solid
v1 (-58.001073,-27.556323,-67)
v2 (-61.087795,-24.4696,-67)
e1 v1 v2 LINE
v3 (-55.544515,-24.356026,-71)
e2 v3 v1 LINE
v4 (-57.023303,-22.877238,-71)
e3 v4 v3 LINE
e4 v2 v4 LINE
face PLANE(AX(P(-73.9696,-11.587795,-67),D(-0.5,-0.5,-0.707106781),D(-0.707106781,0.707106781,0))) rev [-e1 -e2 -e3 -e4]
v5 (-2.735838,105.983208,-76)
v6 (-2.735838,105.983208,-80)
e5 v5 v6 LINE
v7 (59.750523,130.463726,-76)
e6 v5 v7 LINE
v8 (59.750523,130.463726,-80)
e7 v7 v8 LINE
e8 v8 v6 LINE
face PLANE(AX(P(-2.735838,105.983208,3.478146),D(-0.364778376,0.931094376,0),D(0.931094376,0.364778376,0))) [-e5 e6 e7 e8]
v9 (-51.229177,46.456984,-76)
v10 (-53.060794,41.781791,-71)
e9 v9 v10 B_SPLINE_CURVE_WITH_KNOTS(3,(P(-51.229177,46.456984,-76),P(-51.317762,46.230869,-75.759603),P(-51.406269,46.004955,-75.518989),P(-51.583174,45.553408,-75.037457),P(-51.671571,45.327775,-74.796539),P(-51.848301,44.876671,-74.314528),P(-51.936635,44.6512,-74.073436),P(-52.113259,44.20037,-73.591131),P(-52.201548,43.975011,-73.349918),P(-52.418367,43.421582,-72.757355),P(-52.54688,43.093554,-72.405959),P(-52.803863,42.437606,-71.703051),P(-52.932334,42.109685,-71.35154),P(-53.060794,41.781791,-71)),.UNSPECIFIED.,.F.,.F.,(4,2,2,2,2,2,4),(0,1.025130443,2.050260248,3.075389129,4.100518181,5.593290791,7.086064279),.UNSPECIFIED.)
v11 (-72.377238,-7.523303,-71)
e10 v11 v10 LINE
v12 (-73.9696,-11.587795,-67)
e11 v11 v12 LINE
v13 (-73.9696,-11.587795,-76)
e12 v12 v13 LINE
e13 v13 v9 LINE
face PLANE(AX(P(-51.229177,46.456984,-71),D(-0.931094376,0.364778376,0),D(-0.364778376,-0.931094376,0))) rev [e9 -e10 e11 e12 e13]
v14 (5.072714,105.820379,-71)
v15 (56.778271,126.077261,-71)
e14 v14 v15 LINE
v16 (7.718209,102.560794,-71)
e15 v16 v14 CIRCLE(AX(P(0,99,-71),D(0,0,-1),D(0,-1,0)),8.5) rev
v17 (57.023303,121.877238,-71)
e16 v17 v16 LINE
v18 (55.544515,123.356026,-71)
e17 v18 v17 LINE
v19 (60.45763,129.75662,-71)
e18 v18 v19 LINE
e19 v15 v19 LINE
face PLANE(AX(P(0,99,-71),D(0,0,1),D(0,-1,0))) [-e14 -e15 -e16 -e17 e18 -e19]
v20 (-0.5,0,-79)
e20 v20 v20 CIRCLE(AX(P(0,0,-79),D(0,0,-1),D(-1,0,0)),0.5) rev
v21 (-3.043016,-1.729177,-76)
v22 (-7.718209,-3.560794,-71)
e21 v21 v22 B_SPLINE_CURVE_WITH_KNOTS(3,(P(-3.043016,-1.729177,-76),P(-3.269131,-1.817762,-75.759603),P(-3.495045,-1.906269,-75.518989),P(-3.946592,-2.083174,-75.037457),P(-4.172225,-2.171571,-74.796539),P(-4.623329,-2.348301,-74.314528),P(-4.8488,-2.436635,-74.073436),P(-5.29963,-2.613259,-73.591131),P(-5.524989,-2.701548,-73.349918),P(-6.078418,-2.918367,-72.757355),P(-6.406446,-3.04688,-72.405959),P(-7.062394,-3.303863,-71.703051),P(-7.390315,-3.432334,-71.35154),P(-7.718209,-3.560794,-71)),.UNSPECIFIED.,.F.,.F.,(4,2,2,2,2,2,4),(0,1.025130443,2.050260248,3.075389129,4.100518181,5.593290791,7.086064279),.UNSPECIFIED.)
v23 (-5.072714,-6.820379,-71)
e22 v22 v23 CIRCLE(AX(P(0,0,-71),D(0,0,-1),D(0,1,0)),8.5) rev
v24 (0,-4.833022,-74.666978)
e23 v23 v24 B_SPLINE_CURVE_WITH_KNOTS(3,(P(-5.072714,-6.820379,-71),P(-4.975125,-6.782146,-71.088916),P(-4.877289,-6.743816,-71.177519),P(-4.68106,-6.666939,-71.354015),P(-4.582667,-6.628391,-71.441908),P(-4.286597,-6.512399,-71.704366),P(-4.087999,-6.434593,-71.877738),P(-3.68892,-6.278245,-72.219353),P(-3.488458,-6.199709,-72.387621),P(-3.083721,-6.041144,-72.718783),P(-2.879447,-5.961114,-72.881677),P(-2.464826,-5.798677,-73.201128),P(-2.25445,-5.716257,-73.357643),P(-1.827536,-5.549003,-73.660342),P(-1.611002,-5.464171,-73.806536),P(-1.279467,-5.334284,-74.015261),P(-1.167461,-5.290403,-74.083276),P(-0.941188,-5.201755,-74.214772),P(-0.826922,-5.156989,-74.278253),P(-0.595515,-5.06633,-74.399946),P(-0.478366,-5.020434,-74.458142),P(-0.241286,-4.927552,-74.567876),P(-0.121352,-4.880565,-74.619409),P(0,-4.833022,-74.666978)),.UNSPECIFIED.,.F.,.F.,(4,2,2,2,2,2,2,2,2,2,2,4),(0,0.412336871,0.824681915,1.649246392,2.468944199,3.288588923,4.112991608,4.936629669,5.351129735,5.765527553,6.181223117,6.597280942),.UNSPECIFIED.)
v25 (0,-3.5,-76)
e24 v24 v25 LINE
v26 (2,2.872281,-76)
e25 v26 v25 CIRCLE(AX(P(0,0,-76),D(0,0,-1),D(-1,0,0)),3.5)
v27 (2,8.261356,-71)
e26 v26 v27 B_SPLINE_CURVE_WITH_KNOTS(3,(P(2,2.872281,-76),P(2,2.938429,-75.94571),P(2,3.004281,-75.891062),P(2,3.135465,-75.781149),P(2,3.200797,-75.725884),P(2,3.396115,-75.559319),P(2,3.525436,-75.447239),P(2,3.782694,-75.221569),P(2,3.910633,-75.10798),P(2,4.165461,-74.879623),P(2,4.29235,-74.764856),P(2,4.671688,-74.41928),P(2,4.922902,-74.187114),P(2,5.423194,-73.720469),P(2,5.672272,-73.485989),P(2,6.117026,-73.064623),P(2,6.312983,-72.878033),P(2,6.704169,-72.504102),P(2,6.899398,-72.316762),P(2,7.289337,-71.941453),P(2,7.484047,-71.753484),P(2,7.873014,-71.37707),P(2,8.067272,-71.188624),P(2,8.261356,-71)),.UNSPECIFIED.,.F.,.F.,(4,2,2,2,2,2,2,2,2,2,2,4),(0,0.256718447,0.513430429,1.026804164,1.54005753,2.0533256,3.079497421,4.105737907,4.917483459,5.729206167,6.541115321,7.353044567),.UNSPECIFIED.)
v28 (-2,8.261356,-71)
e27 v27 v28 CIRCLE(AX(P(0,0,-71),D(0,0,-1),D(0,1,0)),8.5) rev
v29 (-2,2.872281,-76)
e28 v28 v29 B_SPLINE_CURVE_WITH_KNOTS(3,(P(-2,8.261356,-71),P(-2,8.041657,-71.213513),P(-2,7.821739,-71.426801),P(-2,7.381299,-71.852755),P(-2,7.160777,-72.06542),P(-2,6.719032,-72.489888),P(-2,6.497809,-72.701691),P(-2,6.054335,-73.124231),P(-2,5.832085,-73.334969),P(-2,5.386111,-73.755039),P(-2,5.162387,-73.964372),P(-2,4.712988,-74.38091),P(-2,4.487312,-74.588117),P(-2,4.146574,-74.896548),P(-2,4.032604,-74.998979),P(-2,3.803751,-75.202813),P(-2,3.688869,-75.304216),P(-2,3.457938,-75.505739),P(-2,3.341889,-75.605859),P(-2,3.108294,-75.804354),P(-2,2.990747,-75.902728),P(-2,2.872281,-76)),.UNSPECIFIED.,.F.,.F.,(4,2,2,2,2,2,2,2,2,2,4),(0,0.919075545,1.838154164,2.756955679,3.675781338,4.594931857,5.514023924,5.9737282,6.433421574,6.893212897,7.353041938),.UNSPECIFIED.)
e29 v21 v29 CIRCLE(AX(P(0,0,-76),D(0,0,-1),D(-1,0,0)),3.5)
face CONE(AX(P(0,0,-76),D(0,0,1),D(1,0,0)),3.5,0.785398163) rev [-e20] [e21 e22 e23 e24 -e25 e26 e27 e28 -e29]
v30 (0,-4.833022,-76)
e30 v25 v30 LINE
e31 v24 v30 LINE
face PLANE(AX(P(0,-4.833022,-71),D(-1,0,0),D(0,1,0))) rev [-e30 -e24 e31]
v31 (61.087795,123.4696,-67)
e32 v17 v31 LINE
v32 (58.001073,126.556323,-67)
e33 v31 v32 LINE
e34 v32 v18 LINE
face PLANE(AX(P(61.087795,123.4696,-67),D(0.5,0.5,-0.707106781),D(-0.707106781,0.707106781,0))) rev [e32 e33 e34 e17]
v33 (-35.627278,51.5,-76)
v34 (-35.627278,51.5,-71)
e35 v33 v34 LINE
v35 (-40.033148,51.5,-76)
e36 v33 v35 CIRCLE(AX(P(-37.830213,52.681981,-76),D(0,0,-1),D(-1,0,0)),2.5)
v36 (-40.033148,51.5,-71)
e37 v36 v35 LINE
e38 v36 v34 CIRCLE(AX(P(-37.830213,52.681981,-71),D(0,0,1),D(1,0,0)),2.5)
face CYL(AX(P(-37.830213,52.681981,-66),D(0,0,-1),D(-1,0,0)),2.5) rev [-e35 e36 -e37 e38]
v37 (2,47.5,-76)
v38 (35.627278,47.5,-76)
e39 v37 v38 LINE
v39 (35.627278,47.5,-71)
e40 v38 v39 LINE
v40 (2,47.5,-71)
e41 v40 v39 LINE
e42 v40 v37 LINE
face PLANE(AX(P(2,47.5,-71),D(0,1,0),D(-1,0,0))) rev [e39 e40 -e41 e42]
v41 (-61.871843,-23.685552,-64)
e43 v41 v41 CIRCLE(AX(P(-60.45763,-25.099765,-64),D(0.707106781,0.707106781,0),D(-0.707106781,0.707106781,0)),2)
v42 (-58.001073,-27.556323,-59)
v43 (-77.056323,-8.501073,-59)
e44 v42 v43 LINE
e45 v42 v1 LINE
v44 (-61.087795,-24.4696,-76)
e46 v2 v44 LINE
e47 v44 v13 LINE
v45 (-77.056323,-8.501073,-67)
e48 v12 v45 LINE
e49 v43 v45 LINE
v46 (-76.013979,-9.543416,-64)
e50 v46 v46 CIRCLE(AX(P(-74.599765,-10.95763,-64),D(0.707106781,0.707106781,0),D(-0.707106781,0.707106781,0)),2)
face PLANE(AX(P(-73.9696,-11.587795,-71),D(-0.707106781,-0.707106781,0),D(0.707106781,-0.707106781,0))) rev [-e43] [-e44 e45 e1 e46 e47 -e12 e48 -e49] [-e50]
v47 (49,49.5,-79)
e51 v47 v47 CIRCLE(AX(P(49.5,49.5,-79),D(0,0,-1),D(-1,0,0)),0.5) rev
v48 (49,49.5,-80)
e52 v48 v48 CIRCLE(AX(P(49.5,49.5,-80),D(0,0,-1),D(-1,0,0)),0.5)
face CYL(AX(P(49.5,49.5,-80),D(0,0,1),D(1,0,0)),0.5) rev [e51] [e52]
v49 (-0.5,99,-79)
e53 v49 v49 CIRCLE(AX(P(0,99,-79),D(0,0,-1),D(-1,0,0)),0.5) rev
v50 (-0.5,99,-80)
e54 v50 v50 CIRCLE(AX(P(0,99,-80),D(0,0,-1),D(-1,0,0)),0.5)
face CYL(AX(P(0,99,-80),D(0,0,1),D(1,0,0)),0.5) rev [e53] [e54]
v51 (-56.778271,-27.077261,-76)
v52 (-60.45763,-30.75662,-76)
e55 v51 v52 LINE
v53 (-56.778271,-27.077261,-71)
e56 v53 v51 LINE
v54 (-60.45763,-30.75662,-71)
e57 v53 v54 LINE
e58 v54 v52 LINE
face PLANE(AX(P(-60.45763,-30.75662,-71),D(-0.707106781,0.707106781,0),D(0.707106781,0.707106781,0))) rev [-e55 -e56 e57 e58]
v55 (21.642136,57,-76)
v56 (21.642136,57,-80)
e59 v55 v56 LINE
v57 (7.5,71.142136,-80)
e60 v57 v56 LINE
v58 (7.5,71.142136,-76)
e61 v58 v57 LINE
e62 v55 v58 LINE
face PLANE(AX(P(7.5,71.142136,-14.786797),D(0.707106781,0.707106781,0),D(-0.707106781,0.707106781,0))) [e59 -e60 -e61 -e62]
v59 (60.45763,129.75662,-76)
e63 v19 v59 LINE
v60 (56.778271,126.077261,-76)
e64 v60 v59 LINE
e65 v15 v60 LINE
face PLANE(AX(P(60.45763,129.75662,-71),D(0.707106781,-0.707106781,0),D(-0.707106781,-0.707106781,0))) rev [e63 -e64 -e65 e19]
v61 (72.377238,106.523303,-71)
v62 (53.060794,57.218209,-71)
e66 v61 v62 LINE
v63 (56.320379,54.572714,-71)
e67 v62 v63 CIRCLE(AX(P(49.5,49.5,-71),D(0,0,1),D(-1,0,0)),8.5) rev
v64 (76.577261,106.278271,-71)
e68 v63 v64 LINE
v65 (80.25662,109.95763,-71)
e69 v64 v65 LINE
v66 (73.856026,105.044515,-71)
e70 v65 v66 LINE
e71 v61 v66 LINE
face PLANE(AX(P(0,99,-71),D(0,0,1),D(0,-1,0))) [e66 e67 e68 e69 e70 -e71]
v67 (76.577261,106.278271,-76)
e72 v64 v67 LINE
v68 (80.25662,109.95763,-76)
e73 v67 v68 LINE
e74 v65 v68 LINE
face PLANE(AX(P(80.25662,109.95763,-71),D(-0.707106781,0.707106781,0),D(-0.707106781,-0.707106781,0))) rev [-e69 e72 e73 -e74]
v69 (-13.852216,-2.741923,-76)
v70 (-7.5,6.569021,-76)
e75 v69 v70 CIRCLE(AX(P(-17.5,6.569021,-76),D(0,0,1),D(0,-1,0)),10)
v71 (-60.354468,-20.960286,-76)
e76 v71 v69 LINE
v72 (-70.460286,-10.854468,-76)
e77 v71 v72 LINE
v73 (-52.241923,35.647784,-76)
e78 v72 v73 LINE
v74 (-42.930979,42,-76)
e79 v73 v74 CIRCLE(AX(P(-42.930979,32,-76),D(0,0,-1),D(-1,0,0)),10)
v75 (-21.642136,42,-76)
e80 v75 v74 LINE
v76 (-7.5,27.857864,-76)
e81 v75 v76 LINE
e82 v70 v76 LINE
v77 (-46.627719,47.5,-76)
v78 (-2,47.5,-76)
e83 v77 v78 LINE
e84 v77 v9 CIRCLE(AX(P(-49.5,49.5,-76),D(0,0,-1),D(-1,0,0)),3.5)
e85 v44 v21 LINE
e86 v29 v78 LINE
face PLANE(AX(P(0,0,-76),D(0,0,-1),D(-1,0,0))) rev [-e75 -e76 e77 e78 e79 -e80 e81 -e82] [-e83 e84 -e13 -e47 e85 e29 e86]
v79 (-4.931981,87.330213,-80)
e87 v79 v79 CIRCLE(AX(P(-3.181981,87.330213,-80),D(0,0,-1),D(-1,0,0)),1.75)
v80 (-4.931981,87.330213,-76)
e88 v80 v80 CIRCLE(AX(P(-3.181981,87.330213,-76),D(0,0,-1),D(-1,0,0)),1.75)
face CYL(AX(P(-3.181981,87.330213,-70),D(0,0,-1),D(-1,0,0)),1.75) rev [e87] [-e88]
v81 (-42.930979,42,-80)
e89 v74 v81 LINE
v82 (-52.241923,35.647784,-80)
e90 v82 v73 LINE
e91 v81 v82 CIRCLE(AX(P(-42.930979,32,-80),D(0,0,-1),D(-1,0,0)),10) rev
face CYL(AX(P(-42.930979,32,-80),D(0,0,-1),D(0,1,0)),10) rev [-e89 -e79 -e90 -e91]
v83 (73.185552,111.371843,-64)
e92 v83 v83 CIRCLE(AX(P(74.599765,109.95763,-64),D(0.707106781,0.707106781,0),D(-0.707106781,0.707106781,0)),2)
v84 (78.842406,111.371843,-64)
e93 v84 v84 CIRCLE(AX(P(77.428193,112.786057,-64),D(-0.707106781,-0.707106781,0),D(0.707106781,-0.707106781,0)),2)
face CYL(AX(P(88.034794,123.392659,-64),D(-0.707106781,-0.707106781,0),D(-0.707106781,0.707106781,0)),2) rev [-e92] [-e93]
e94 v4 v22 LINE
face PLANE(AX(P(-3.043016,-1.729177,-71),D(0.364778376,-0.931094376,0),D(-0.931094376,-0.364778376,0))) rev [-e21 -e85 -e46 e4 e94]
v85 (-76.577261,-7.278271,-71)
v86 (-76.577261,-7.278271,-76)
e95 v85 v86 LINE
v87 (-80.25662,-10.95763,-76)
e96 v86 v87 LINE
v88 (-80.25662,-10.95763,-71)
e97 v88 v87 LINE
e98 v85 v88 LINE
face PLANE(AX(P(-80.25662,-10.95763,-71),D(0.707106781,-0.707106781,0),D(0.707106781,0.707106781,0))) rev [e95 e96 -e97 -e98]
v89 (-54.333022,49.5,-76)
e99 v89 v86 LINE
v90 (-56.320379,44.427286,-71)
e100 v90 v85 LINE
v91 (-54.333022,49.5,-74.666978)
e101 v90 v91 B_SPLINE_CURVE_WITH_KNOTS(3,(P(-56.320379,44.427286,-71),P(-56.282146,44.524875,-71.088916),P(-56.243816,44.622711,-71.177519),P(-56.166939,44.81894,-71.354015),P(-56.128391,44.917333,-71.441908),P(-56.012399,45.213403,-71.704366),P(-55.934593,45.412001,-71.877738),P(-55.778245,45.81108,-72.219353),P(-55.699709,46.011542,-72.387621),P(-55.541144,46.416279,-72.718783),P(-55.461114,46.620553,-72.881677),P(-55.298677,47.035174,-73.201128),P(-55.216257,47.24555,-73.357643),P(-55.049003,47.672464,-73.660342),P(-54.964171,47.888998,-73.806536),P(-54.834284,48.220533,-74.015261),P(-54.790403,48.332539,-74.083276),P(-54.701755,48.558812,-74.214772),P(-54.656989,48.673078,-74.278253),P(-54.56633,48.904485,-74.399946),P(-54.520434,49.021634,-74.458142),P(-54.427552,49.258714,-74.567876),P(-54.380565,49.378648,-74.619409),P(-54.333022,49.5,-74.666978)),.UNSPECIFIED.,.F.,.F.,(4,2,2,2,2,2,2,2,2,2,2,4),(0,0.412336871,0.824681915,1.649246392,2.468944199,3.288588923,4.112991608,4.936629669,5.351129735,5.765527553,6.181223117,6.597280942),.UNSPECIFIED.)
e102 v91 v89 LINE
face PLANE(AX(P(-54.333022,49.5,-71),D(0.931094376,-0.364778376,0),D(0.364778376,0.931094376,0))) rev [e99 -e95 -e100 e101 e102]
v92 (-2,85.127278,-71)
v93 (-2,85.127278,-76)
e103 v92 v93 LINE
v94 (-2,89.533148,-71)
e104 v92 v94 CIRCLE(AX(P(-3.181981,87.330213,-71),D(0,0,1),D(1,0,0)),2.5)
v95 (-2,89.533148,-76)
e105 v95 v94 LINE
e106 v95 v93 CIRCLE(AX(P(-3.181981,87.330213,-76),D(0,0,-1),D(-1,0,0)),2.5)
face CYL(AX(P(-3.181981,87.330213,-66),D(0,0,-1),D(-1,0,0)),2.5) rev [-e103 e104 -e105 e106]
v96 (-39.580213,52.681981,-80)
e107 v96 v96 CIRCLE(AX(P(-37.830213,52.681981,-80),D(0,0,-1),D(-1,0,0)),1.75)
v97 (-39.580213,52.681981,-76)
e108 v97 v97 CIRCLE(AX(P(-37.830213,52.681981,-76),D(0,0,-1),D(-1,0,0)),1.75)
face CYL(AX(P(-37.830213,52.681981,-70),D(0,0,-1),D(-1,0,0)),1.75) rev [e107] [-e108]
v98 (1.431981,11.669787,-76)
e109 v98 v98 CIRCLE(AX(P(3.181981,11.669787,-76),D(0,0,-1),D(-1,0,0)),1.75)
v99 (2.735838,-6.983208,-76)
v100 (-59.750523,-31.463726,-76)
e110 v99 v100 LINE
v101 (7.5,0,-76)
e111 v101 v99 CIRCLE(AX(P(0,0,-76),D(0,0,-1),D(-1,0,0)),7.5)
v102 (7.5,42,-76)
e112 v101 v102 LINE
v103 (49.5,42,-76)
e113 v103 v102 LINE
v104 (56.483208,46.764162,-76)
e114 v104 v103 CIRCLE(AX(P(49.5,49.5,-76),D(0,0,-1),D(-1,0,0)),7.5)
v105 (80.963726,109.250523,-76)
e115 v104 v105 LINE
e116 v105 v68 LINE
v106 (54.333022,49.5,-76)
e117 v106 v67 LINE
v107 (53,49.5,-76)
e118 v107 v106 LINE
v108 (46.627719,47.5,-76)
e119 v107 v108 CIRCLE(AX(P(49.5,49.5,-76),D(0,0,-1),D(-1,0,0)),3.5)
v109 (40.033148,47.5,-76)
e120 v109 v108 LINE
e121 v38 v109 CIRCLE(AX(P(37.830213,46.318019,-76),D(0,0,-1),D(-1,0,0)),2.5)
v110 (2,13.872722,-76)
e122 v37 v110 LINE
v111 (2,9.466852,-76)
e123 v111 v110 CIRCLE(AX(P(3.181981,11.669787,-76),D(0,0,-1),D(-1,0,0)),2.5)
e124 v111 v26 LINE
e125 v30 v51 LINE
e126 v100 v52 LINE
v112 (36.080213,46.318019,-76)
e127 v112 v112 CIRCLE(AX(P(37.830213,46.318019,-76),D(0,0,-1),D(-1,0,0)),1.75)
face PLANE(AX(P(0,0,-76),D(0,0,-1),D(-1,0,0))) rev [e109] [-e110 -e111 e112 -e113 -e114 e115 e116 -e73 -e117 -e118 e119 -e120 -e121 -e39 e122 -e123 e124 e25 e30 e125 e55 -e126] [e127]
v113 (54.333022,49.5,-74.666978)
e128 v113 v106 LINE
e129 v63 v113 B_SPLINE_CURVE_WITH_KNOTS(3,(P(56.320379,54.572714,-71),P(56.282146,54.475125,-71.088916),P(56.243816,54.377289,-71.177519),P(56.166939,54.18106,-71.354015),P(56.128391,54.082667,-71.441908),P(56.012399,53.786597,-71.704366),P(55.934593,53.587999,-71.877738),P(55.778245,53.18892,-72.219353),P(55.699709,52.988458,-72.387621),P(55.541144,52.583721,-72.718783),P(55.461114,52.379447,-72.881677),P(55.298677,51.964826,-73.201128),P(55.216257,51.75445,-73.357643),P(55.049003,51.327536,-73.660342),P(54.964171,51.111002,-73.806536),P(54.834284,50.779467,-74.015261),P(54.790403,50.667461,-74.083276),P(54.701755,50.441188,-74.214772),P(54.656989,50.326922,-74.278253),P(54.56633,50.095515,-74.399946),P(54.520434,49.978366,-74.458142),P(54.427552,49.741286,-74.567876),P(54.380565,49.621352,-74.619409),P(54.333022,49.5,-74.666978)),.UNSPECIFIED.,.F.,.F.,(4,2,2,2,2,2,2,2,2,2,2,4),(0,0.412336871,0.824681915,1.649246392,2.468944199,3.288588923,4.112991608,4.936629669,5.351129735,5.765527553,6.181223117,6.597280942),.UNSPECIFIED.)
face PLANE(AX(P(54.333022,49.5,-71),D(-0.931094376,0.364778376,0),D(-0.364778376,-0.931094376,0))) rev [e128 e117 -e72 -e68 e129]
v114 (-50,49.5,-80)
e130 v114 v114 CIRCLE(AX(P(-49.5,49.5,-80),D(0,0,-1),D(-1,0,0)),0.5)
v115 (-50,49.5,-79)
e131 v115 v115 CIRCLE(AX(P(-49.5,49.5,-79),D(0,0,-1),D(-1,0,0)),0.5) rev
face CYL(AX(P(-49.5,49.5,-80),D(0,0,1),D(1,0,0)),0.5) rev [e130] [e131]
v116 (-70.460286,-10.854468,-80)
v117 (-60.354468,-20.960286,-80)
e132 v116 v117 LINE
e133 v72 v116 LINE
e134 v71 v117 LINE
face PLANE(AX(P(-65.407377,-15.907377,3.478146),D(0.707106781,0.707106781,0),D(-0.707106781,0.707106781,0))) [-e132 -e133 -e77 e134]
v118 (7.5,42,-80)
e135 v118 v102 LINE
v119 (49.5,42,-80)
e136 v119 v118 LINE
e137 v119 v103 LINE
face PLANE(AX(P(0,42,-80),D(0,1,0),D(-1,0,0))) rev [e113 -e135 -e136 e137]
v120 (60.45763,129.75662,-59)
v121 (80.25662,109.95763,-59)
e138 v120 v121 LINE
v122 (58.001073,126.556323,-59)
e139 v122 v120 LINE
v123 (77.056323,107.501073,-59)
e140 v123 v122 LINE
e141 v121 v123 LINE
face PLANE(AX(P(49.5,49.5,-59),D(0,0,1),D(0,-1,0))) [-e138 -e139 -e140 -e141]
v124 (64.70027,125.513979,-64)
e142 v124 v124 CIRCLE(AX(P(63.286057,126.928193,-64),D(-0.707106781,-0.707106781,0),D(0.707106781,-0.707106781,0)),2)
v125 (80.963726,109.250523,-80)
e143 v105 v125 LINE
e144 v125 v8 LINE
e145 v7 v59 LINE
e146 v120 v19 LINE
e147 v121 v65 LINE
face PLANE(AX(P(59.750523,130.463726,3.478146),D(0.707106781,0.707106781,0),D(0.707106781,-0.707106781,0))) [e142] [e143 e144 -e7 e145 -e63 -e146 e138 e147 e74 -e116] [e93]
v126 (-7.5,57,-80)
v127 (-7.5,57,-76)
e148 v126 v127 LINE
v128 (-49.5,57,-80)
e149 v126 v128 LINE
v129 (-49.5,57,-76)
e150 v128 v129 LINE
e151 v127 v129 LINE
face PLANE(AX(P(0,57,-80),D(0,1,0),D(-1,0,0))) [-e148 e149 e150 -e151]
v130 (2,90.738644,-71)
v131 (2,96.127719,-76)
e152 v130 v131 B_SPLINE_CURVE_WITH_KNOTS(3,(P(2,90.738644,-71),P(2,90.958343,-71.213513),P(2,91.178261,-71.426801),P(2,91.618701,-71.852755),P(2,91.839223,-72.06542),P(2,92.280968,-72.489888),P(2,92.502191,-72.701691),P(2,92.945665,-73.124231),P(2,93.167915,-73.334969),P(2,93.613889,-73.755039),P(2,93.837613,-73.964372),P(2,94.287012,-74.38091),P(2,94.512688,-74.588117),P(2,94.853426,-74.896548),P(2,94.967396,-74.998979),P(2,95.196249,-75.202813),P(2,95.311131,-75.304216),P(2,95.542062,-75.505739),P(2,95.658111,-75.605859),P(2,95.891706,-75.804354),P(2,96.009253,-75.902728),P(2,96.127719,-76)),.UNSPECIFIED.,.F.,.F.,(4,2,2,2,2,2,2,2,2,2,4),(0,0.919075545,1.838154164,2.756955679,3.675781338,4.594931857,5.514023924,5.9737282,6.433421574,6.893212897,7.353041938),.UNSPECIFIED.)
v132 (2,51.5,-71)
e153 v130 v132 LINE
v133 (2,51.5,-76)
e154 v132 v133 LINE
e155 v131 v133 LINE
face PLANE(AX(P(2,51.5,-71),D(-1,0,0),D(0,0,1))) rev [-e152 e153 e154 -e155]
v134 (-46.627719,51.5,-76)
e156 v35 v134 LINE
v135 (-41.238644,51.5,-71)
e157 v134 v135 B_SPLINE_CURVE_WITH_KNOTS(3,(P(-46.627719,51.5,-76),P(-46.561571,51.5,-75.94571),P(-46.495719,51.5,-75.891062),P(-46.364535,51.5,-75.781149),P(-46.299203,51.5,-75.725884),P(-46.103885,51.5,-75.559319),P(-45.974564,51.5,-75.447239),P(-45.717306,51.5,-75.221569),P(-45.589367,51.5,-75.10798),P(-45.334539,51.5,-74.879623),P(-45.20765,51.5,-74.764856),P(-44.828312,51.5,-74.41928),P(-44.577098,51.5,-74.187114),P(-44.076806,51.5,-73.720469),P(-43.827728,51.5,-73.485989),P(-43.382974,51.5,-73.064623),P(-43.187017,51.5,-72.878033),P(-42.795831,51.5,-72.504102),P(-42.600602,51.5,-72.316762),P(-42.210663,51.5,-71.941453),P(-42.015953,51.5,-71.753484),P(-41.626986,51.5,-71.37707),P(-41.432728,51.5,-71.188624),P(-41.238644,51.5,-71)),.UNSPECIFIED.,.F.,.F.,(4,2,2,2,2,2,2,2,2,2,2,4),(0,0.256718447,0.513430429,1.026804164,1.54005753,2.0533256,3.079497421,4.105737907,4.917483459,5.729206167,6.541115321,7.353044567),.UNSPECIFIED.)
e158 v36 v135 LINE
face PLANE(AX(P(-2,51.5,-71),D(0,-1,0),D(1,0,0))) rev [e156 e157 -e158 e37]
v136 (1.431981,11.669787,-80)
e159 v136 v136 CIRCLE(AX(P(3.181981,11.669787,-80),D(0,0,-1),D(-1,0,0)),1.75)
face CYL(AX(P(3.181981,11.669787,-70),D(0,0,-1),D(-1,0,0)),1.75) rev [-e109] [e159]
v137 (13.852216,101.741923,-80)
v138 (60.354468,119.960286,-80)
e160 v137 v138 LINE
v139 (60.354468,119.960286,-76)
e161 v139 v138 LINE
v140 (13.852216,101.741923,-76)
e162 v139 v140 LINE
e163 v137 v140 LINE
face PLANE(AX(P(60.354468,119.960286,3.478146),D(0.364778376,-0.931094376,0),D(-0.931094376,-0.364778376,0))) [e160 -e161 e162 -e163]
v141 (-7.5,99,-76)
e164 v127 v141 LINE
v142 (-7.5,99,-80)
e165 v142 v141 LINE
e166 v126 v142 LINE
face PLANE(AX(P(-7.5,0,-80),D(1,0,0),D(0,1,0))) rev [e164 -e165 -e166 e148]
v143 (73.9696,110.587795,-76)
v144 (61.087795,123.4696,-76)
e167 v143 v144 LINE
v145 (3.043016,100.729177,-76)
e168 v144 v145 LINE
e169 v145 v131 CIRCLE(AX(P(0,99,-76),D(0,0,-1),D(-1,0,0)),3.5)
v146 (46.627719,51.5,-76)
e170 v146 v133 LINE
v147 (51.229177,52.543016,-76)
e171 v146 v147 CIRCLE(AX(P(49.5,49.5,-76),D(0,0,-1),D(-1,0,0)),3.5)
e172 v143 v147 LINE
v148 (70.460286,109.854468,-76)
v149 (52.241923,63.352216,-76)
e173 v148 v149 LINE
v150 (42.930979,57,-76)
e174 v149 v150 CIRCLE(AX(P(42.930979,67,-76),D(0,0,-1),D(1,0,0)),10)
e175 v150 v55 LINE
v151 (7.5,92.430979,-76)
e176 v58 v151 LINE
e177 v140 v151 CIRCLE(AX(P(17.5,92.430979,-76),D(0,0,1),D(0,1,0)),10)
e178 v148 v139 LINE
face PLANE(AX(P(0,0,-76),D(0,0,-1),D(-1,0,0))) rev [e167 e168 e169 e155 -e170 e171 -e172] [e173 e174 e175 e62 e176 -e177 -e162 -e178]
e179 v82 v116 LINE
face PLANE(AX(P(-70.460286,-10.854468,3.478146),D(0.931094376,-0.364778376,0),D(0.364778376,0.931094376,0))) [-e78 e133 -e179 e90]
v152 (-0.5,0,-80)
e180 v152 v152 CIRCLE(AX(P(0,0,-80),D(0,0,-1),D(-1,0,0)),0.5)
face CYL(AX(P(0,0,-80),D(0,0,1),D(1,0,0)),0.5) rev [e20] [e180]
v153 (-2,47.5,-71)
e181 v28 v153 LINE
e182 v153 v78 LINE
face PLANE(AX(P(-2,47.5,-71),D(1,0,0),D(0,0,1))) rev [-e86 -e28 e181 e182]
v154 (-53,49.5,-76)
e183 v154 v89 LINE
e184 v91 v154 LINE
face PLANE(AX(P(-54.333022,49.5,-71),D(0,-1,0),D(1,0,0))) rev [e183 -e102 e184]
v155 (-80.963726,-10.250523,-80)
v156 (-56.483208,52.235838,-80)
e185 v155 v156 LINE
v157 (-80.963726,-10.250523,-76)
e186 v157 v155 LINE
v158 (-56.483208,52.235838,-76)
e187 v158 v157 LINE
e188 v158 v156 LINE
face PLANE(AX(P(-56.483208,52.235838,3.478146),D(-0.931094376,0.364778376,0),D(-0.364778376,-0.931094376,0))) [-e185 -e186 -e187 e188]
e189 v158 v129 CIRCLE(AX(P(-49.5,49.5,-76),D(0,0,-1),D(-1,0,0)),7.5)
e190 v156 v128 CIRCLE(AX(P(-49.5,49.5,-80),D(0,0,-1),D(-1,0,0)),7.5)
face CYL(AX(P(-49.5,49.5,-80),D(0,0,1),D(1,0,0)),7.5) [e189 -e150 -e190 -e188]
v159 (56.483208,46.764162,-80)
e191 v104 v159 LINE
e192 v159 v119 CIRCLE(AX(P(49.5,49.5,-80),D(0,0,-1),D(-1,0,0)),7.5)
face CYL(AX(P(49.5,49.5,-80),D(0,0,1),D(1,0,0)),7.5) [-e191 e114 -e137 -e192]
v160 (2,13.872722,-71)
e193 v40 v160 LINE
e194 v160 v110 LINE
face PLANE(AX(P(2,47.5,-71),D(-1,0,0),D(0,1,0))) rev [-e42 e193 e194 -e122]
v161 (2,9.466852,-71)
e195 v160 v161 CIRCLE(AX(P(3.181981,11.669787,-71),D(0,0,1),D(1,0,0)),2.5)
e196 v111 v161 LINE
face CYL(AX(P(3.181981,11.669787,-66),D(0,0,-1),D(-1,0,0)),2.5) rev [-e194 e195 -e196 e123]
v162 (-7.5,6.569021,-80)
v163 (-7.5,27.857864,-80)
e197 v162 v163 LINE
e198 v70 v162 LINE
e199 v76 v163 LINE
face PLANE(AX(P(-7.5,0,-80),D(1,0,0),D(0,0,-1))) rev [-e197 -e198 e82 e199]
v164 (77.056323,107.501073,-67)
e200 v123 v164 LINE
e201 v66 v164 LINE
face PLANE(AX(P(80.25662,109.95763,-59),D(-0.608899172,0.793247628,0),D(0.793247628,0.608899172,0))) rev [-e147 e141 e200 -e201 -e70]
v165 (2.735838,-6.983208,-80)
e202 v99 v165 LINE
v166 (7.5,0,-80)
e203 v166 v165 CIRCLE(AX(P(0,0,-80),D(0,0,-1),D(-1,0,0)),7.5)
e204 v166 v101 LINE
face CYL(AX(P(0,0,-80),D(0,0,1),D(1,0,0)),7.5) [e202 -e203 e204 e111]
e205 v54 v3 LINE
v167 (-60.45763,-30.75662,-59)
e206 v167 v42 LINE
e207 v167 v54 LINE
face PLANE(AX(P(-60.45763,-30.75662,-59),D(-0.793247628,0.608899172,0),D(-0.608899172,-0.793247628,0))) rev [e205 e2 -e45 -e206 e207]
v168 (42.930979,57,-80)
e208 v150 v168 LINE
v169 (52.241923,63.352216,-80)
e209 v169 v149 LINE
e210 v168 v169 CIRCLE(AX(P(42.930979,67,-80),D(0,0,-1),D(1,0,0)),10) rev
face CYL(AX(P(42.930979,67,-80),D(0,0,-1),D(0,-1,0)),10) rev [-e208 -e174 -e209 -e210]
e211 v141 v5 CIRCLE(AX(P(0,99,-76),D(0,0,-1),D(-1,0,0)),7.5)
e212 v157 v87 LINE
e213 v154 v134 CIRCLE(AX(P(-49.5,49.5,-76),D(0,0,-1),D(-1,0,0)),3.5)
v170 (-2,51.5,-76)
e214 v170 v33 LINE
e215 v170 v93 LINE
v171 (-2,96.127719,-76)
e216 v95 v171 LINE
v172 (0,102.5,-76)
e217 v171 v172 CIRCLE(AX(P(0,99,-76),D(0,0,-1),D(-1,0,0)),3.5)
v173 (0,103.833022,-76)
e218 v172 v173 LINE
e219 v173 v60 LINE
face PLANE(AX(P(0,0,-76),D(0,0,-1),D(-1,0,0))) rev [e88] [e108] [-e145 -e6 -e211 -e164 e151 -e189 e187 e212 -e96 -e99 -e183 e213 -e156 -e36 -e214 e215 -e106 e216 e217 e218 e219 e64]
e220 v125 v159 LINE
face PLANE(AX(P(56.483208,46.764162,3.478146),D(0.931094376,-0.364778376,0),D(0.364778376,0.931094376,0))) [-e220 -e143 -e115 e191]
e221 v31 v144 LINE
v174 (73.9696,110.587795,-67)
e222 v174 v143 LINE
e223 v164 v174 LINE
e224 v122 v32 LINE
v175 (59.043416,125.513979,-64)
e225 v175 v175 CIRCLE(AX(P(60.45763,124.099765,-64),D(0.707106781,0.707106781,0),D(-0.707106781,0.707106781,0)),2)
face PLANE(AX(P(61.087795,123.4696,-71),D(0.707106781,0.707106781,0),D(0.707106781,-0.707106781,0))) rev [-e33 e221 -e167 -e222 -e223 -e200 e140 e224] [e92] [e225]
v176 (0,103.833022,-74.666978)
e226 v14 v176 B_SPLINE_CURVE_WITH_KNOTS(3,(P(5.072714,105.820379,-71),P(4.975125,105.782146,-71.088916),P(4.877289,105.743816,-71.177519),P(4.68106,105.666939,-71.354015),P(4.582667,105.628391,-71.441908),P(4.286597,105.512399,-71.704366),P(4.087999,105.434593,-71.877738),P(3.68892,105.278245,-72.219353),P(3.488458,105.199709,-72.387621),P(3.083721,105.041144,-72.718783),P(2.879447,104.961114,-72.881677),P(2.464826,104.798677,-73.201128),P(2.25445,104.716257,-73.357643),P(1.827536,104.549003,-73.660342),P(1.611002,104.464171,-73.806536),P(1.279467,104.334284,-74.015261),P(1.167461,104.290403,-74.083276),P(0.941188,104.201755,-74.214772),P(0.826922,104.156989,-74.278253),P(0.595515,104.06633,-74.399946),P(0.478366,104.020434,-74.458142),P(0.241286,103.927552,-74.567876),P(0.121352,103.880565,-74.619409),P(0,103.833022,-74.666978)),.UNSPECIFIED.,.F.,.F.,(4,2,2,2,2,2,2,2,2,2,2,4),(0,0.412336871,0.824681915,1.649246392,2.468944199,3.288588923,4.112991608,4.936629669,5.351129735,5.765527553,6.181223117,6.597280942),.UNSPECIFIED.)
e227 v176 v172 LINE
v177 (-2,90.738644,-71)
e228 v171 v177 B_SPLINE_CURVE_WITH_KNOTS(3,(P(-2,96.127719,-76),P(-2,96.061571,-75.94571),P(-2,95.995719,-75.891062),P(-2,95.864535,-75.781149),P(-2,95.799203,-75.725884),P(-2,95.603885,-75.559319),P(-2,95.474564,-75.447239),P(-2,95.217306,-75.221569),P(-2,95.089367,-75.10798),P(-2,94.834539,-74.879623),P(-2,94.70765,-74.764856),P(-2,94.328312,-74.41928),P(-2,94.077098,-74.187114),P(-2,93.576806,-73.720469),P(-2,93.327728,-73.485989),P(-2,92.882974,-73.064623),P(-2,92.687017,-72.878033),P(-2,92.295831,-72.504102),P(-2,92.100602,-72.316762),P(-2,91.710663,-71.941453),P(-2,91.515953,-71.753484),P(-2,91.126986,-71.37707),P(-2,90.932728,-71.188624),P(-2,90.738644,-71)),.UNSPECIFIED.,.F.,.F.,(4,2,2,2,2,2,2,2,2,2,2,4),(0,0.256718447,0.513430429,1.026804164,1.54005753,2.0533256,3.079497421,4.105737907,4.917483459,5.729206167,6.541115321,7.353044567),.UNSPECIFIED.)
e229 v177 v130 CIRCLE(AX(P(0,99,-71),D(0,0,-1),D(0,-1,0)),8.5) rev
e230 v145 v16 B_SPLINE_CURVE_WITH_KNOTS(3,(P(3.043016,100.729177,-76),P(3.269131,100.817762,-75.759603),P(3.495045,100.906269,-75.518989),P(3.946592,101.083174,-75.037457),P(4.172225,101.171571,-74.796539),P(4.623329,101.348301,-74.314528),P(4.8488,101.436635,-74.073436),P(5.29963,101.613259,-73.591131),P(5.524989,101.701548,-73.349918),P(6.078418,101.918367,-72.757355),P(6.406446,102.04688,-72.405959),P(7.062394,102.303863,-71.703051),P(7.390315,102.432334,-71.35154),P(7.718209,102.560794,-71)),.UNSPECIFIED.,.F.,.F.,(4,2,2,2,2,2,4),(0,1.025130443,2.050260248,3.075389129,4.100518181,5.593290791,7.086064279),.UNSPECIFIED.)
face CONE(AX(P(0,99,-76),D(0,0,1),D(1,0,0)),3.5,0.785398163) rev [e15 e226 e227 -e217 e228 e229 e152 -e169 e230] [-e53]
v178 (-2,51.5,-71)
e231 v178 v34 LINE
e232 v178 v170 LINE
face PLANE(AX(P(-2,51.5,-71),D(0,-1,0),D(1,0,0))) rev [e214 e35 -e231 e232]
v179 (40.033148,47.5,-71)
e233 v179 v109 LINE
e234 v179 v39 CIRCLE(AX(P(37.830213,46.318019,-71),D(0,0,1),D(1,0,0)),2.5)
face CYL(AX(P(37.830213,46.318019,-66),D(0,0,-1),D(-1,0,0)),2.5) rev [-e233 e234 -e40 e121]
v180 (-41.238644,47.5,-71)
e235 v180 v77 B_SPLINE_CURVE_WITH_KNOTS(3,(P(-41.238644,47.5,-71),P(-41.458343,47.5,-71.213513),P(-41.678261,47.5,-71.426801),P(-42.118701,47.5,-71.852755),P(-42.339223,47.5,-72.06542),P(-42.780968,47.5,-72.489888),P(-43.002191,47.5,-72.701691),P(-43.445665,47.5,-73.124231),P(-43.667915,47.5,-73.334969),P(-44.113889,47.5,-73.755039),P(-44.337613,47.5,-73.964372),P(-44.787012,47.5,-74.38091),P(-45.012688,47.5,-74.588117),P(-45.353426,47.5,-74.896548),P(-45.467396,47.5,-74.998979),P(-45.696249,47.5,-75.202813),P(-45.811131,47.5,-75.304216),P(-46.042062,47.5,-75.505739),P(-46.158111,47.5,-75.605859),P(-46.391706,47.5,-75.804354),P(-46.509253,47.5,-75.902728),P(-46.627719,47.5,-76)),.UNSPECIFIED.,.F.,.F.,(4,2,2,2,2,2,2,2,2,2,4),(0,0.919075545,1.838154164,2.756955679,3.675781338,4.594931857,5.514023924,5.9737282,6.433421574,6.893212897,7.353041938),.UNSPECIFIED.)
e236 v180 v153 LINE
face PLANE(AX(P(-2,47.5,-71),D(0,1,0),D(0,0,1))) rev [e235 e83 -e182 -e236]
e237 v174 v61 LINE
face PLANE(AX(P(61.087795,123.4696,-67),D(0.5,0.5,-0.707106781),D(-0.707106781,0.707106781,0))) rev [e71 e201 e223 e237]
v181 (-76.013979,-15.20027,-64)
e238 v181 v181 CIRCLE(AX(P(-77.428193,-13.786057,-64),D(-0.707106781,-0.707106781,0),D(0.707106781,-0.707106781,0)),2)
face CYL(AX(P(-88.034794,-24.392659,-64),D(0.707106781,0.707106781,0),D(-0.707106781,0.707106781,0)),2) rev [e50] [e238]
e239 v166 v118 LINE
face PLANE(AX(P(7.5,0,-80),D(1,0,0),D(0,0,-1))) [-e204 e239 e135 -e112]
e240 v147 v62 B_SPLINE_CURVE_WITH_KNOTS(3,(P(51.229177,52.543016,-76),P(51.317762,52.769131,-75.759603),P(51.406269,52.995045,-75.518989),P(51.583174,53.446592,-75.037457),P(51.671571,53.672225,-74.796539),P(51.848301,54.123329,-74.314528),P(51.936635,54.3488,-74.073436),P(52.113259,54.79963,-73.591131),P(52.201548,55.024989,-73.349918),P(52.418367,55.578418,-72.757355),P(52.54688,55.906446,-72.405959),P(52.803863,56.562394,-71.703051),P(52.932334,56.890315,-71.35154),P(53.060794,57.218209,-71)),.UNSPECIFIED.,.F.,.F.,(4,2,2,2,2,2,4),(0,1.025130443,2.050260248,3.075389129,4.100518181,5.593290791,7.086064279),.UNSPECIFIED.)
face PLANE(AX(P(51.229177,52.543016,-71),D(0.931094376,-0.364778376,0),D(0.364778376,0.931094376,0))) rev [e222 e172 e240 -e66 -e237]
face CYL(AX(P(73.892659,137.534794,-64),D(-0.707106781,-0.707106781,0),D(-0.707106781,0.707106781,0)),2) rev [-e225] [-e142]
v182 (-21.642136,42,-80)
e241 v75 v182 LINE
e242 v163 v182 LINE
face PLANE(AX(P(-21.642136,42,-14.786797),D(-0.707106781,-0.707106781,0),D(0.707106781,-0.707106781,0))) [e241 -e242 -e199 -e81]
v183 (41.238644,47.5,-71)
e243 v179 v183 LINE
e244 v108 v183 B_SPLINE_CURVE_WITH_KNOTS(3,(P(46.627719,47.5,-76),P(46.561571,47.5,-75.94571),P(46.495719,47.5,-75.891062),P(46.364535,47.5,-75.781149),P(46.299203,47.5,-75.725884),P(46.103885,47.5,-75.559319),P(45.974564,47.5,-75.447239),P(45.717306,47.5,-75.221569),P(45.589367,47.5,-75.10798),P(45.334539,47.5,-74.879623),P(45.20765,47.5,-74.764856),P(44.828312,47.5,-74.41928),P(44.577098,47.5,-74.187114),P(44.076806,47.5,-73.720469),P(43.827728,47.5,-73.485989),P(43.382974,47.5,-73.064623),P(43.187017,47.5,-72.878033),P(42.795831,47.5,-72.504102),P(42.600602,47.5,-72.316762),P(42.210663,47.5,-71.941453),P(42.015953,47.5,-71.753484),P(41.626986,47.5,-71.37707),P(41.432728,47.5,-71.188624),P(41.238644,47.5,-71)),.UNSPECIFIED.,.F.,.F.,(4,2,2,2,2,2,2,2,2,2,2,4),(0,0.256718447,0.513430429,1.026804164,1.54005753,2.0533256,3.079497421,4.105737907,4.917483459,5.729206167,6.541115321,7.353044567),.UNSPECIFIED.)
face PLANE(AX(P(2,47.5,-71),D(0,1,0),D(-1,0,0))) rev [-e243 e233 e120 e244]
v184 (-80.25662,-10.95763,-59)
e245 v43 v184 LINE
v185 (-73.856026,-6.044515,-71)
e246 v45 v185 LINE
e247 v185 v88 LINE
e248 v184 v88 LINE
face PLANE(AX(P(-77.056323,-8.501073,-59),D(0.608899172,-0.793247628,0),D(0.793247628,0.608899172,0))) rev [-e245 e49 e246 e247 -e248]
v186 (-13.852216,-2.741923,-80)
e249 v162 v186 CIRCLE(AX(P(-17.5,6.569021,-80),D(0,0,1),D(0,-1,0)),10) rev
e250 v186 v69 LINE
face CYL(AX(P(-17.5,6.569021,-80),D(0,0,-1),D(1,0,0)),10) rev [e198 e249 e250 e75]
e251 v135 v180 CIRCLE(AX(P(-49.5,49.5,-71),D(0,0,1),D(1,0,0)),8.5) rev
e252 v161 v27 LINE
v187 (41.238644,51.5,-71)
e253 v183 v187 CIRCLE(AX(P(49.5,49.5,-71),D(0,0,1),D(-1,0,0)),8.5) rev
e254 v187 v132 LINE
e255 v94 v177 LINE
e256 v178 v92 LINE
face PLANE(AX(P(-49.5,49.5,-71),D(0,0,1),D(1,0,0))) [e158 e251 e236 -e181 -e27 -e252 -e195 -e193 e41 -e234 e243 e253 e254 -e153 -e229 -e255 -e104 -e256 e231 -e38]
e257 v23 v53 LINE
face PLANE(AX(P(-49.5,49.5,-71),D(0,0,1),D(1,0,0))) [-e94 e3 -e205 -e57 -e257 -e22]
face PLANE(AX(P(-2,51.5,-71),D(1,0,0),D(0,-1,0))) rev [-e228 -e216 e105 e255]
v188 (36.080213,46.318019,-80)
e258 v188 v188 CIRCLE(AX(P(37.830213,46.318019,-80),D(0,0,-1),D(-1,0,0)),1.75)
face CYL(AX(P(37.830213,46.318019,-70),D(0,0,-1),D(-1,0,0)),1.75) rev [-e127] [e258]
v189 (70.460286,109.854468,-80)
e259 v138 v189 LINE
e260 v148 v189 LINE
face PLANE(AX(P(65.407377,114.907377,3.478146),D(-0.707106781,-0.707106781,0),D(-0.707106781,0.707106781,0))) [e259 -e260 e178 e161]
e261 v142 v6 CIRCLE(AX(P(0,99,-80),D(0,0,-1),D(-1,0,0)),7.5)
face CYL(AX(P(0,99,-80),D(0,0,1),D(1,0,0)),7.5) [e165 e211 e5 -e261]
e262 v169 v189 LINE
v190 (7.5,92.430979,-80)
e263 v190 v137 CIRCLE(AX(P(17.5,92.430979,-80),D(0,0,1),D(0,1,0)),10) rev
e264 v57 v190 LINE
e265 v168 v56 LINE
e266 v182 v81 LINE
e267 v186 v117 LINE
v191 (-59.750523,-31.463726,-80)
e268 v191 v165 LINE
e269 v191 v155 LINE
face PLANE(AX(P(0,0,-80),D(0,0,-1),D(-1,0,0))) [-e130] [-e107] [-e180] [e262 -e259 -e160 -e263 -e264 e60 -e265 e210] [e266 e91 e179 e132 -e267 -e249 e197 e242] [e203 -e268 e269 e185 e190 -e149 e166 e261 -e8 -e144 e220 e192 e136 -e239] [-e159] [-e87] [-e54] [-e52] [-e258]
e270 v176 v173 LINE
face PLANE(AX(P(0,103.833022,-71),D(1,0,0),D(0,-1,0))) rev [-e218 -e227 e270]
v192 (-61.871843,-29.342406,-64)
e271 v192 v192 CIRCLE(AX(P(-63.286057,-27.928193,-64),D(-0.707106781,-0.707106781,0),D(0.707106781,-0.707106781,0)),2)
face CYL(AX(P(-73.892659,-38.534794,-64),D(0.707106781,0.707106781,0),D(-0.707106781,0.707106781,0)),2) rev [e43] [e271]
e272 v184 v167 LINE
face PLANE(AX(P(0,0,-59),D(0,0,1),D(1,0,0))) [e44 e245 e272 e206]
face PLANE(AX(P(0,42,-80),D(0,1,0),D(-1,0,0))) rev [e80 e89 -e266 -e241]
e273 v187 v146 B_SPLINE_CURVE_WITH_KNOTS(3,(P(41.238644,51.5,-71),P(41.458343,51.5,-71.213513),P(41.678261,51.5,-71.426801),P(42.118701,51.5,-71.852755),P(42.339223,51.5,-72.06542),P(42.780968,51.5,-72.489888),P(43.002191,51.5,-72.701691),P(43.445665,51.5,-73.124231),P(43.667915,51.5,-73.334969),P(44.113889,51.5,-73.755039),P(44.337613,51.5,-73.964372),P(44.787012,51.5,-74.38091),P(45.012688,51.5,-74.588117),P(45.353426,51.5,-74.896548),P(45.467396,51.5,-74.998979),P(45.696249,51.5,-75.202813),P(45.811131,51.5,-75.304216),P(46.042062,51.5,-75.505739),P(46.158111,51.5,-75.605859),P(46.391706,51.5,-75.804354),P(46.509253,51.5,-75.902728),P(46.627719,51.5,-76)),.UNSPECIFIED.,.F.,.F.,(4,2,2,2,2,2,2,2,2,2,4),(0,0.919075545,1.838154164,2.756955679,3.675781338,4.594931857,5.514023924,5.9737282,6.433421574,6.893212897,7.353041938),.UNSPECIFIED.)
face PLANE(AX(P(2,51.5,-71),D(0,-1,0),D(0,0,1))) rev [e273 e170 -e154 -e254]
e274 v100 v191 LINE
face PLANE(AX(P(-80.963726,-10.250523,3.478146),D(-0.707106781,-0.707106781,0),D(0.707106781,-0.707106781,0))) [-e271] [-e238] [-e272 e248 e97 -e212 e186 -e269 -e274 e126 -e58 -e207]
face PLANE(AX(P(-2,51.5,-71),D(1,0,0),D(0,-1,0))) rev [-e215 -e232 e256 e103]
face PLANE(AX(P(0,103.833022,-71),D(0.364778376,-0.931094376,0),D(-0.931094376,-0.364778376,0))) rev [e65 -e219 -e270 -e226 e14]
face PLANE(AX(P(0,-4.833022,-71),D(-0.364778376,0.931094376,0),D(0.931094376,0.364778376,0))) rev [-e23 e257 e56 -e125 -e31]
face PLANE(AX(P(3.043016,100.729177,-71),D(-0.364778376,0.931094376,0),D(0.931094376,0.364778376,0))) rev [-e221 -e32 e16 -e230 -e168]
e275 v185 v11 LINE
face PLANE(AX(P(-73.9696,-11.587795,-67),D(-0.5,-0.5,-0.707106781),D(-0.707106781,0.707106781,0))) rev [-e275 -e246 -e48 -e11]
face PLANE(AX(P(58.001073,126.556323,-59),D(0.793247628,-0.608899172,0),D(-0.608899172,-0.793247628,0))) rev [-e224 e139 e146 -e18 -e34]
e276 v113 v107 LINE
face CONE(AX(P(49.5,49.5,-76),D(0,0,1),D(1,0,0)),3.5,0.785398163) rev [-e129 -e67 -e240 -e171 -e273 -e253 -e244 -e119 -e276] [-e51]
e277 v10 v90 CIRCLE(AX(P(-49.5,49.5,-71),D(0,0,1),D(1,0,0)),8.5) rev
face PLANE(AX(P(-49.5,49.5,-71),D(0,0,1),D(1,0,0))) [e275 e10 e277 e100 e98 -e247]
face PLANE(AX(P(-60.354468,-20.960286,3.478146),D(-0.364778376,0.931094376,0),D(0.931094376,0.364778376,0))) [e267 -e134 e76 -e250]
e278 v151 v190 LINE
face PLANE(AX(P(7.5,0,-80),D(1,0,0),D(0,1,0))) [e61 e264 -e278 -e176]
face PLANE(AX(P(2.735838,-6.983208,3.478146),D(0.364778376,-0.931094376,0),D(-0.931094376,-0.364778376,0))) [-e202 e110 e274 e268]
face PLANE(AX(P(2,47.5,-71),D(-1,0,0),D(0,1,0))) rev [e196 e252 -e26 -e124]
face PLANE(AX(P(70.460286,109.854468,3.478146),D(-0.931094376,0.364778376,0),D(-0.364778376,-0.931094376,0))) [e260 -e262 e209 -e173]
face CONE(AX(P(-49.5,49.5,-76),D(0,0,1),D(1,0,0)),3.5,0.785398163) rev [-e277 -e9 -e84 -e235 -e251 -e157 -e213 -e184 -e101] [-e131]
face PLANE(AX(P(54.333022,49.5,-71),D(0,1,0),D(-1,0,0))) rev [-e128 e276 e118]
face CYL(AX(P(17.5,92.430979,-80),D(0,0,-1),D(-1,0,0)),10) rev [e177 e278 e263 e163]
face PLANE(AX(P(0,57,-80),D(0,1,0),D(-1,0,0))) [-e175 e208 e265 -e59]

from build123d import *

# Parameters (mm, degrees)
SKETCH2_R           = 0.5
SKETCH2_R_2         = 0.49999999999999917
SKETCH2_R_3         = 0.5000000000000001
BOSS_EXTRUDE1_DEPTH = 4
CHAMFER1_SIZE       = 3
BOSS_EXTRUDE2_DEPTH = 4
FILLET1_R           = 10
BOSS_EXTRUDE4_DEPTH = 5
CHAMFER2_SIZE       = 5
BOSS_EXTRUDE5_DEPTH = 12
CHAMFER3_SIZE       = 4
SKETCH7_R           = 1.9999999999999967
CUT_EXTRUDE1_DEPTH  = 197.57038973194156
SKETCH8_R           = 1.7500000000000013
SKETCH8_R_2         = 1.7500000000000038
SKETCH8_R_3         = 1.7499999999999993
CUT_EXTRUDE2_DEPTH  = 10
CUT_EXTRUDE3_START  = -4
SKETCH9_R           = 2.5000000000000027
SKETCH9_R_2         = 2.5000000000000018
SKETCH9_R_3         = 2.5
CUT_EXTRUDE3_DEPTH  = 10
BOSS_EXTRUDE6_DEPTH = 4


with BuildPart() as part:
    # Sketch2 → Boss-Extrude1 (new body)
    with BuildSketch(Plane(origin=(-1.25e-15, -1.7e-16, -75.99999999999999), x_dir=(-1, 0, 2e-17), z_dir=(-2e-17, 0, -1))):
        with BuildLine():
            Line((-7.5, 42.00000000000002), (-7.5, -2.45e-15))
            ThreePointArc((-7.5, -2.45e-15), (1e-16, -7.5), (7.5, -1.8e-15))
            Line((7.5, 1.12e-15), (7.5, 41.999999999999964))
            Line((7.5, 41.999999999999964), (49.50000000000001, 41.99999999999978))
            ThreePointArc((49.50000000000001, 41.99999999999978), (57.0000000000001, 49.49999999999975), (49.50000000000007, 56.99999999999978))
            Line((49.500000000000064, 56.99999999999979), (7.5, 56.99999999999995))
            Line((7.5, 56.99999999999995), (7.499999999999976, 99.00000000000001))
            ThreePointArc((7.499999999999975, 99.00000000000001), (-2.319e-14, 106.5), (-7.500000000000025, 99.00000000000001))
            Line((-7.500000000000024, 99.00000000000001), (-7.500000000000015, 57.000000000000014))
            Line((-7.5, 57.000000000000014), (-49.49999999999994, 57.00000000000019))
            ThreePointArc((-49.49999999999994, 57.00000000000019), (-57.000000000000064, 49.50000000000023), (-49.49999999999999, 42.000000000000206))
            Line((-49.49999999999999, 42.0000000000002), (-7.5, 42.00000000000002))
        make_face()
        Circle(SKETCH2_R, mode=Mode.SUBTRACT)
        with Locations((49.5, 49.49999999999988)):
            Circle(SKETCH2_R_2, mode=Mode.SUBTRACT)
        with Locations((-49.5, 49.50000000000013)):
            Circle(SKETCH2_R_2, mode=Mode.SUBTRACT)
        with Locations((-2.352e-14, 99)):
            Circle(SKETCH2_R_3, mode=Mode.SUBTRACT)
    extrude(amount=BOSS_EXTRUDE1_DEPTH)

    # Chamfer1
    chamfer1_edges = [part.edges().sort_by_distance(p)[0] for p in [
        (0.49999999999999867, -1.1e-16, -75.99999999999999),
        (-49, 49.49999999999988, -75.99999999999999),
        (0.5000000000000224, 99, -75.99999999999999),
        (50, 49.50000000000013, -75.99999999999999),
    ]]
    chamfer(chamfer1_edges, length=CHAMFER1_SIZE)

    # Sketch3 → Boss-Extrude2 (add)
    with BuildSketch(Plane(origin=(0, 0, -79.99999999999999), x_dir=(-1, 0, 0), z_dir=(0, 0, -1))):
        Polygon((56.48320781823236, 52.235837818178865), (80.96372644585969, -10.250523010263308), (70.35712472806149, -20.85712472806152), (65.40737725975566, -15.907377259755682), (70.46028645315, -10.854468066361337), (49.7516366918705, 42.004222590330855), align=None)
    extrude(amount=-BOSS_EXTRUDE2_DEPTH)

    # Fillet1
    fillet1_edges = [part.edges().sort_by_distance(p)[0] for p in [
        (-49.7516366918705, 42.004222590330855, -77.99999999999999),
    ]]
    fillet(fillet1_edges, radius=FILLET1_R)

    # Sketch5 → Boss-Extrude4 (add)
    with BuildSketch(Plane.XY.offset(-75.99999999999999)):
        with BuildLine():
            Line((0, 49.49999999999989), (-2.0000000000000018, 51.49999999999989))
            Line((-2.0000000000000018, 51.49999999999989), (-46.62771867673098, 51.499999999999886))
            ThreePointArc((-46.62771867673098, 51.499999999999886), (-45.999999999999986, 49.499999999999886), (-46.627718676730964, 47.499999999999886))
            Line((-46.627718676730964, 47.499999999999886), (-1.9999999999999982, 47.499999999999886))
            Line((-1.9999999999999982, 47.499999999999886), (0, 49.49999999999989))
        make_face()
        with BuildLine():
            Line((-54.33302242729803, 49.49999999999989), (-76.5772611619678, -7.2782712887445))
            Line((-76.5772611619678, -7.2782712887445), (-80.25661966467315, -10.957629791449861))
            Line((-80.25661966467315, -10.957629791449861), (-78.64868432735105, -12.56556512877197))
            Line((-78.64868432735105, -12.56556512877197), (-70.35712472806149, -20.85712472806152))
            Line((-70.35712472806149, -20.85712472806152), (-67.5286976033153, -18.028697603315333))
            Line((-67.5286976033153, -18.028697603315333), (-73.96959982780758, -11.587795378823028))
            Line((-73.96959982780758, -11.587795378823028), (-51.229176548510004, 46.45698365694761))
            ThreePointArc((-51.229176548510004, 46.45698365694761), (-52.525071728057476, 47.73961906392169), (-53.00000000000002, 49.4999999999999))
            Line((-53.00000000000002, 49.4999999999999), (-54.33302242729803, 49.49999999999989))
        make_face()
    extrude(amount=BOSS_EXTRUDE4_DEPTH)

    # Chamfer2
    chamfer2_edges = [part.edges().sort_by_distance(p)[0] for p in [
        (-45.999999999999986, 49.499999999999886, -70.99999999999999),
        (-52.525071728057476, 47.73961906392169, -70.99999999999999),
    ]]
    chamfer(chamfer2_edges, length=CHAMFER2_SIZE - 0.0001)  # a hair under: the kernel refuses the full size

    # Mirror2: part across plane


with BuildPart() as part_1:
    add(part.part)
    add(part.part.mirror(Plane(origin=(-70.35712472806149, -20.85712472806152, 3.478146182439232), x_dir=(0, 0, 1), z_dir=(0.7071067811865482, -0.7071067811865468, 0))))

    # Sketch6 → Boss-Extrude5 (add)
    with BuildSketch(Plane.XY.offset(-70.99999999999999)):
        Polygon((-80.25661966467315, -10.957629791449861), (-60.45762979144981, -30.75661966467317), (-58.00107255414479, -27.5563226524858), (-77.05632265248579, -8.501072554144805), align=None)
    extrude(amount=BOSS_EXTRUDE5_DEPTH)

    # Chamfer3
    chamfer3_edges = [part_1.edges().sort_by_distance(p)[0] for p in [
        (-59.54443396648389, -26.012961240146698, -70.99999999999999),
        (-75.51296124014668, -10.044433966483911, -70.99999999999999),
    ]]
    chamfer(chamfer3_edges, length=CHAMFER3_SIZE)

    # Sketch7 → Cut-Extrude1 (cut, through all)
    with BuildSketch(Plane(origin=(-42.77869760331542, -42.7786976033153, 0), x_dir=(0, 0, -1), z_dir=(0.7071067811865475, 0.7071067811865477, 0))):
        with Locations(Location((63.99999999999996, 45.00178566873401, 0), (0, 0, 90))):
            Circle(SKETCH7_R)
        with Locations(Location((63.99999999999996, 25.001785668734005, 0), (0, 0, 90))):
            Circle(SKETCH7_R)
    extrude(amount=-CUT_EXTRUDE1_DEPTH, mode=Mode.SUBTRACT)

    # Mirror3: part across plane


with BuildPart() as part_2:
    add(part_1.part)
    add(part_1.part.mirror(Plane(origin=(0, 49.49999999999989, -70.99999999999999), x_dir=(0, 0, 1), z_dir=(-0.7071067811865476, -0.7071067811865476, 0))))

    # Sketch8 → Cut-Extrude2 (cut)
    with BuildSketch(Plane(origin=(0, 0, -79.99999999999999), x_dir=(-1, 0, 0), z_dir=(0, 0, -1))):
        with Locations((3.1819805153394918, 87.33021279348041)):
            Circle(SKETCH8_R)
        with Locations((37.83021279348029, 52.68198051533957)):
            Circle(SKETCH8_R_2)
        with Locations((-3.1819805153395033, 11.669787206519844)):
            Circle(SKETCH8_R_3)
        with Locations((-37.83021279348031, 46.31801948466069)):
            Circle(SKETCH8_R_2)
    extrude(amount=-CUT_EXTRUDE2_DEPTH, mode=Mode.SUBTRACT)

    # Sketch9 → Cut-Extrude3 (cut)
    with BuildSketch(Plane(origin=(0, 0, -79.99999999999999), x_dir=(-1, 0, 0), z_dir=(0, 0, -1)).offset(CUT_EXTRUDE3_START)):
        with Locations((-37.83021279348031, 46.31801948466069)):
            Circle(SKETCH9_R)
        with Locations((3.1819805153394918, 87.33021279348041)):
            Circle(SKETCH9_R_2)
        with Locations((37.83021279348029, 52.68198051533957)):
            Circle(SKETCH9_R)
        with Locations((-3.1819805153395038, 11.669787206519844)):
            Circle(SKETCH9_R_3)
    extrude(amount=-CUT_EXTRUDE3_DEPTH, mode=Mode.SUBTRACT)

    # Sketch10 → Boss-Extrude6 (add)
    with BuildSketch(Plane(origin=(0, 0, -79.99999999999999), x_dir=(-1, 0, 0), z_dir=(0, 0, -1))):
        Polygon((-7.499999999999999, 71.14213562373105), (21.642135623731086, 41.99999999999998), (7.5000000000001386, 27.857864376269028), (-21.642135623730947, 57.0000000000001), align=None)
    extrude(amount=-BOSS_EXTRUDE6_DEPTH)


solid = part_2.part
